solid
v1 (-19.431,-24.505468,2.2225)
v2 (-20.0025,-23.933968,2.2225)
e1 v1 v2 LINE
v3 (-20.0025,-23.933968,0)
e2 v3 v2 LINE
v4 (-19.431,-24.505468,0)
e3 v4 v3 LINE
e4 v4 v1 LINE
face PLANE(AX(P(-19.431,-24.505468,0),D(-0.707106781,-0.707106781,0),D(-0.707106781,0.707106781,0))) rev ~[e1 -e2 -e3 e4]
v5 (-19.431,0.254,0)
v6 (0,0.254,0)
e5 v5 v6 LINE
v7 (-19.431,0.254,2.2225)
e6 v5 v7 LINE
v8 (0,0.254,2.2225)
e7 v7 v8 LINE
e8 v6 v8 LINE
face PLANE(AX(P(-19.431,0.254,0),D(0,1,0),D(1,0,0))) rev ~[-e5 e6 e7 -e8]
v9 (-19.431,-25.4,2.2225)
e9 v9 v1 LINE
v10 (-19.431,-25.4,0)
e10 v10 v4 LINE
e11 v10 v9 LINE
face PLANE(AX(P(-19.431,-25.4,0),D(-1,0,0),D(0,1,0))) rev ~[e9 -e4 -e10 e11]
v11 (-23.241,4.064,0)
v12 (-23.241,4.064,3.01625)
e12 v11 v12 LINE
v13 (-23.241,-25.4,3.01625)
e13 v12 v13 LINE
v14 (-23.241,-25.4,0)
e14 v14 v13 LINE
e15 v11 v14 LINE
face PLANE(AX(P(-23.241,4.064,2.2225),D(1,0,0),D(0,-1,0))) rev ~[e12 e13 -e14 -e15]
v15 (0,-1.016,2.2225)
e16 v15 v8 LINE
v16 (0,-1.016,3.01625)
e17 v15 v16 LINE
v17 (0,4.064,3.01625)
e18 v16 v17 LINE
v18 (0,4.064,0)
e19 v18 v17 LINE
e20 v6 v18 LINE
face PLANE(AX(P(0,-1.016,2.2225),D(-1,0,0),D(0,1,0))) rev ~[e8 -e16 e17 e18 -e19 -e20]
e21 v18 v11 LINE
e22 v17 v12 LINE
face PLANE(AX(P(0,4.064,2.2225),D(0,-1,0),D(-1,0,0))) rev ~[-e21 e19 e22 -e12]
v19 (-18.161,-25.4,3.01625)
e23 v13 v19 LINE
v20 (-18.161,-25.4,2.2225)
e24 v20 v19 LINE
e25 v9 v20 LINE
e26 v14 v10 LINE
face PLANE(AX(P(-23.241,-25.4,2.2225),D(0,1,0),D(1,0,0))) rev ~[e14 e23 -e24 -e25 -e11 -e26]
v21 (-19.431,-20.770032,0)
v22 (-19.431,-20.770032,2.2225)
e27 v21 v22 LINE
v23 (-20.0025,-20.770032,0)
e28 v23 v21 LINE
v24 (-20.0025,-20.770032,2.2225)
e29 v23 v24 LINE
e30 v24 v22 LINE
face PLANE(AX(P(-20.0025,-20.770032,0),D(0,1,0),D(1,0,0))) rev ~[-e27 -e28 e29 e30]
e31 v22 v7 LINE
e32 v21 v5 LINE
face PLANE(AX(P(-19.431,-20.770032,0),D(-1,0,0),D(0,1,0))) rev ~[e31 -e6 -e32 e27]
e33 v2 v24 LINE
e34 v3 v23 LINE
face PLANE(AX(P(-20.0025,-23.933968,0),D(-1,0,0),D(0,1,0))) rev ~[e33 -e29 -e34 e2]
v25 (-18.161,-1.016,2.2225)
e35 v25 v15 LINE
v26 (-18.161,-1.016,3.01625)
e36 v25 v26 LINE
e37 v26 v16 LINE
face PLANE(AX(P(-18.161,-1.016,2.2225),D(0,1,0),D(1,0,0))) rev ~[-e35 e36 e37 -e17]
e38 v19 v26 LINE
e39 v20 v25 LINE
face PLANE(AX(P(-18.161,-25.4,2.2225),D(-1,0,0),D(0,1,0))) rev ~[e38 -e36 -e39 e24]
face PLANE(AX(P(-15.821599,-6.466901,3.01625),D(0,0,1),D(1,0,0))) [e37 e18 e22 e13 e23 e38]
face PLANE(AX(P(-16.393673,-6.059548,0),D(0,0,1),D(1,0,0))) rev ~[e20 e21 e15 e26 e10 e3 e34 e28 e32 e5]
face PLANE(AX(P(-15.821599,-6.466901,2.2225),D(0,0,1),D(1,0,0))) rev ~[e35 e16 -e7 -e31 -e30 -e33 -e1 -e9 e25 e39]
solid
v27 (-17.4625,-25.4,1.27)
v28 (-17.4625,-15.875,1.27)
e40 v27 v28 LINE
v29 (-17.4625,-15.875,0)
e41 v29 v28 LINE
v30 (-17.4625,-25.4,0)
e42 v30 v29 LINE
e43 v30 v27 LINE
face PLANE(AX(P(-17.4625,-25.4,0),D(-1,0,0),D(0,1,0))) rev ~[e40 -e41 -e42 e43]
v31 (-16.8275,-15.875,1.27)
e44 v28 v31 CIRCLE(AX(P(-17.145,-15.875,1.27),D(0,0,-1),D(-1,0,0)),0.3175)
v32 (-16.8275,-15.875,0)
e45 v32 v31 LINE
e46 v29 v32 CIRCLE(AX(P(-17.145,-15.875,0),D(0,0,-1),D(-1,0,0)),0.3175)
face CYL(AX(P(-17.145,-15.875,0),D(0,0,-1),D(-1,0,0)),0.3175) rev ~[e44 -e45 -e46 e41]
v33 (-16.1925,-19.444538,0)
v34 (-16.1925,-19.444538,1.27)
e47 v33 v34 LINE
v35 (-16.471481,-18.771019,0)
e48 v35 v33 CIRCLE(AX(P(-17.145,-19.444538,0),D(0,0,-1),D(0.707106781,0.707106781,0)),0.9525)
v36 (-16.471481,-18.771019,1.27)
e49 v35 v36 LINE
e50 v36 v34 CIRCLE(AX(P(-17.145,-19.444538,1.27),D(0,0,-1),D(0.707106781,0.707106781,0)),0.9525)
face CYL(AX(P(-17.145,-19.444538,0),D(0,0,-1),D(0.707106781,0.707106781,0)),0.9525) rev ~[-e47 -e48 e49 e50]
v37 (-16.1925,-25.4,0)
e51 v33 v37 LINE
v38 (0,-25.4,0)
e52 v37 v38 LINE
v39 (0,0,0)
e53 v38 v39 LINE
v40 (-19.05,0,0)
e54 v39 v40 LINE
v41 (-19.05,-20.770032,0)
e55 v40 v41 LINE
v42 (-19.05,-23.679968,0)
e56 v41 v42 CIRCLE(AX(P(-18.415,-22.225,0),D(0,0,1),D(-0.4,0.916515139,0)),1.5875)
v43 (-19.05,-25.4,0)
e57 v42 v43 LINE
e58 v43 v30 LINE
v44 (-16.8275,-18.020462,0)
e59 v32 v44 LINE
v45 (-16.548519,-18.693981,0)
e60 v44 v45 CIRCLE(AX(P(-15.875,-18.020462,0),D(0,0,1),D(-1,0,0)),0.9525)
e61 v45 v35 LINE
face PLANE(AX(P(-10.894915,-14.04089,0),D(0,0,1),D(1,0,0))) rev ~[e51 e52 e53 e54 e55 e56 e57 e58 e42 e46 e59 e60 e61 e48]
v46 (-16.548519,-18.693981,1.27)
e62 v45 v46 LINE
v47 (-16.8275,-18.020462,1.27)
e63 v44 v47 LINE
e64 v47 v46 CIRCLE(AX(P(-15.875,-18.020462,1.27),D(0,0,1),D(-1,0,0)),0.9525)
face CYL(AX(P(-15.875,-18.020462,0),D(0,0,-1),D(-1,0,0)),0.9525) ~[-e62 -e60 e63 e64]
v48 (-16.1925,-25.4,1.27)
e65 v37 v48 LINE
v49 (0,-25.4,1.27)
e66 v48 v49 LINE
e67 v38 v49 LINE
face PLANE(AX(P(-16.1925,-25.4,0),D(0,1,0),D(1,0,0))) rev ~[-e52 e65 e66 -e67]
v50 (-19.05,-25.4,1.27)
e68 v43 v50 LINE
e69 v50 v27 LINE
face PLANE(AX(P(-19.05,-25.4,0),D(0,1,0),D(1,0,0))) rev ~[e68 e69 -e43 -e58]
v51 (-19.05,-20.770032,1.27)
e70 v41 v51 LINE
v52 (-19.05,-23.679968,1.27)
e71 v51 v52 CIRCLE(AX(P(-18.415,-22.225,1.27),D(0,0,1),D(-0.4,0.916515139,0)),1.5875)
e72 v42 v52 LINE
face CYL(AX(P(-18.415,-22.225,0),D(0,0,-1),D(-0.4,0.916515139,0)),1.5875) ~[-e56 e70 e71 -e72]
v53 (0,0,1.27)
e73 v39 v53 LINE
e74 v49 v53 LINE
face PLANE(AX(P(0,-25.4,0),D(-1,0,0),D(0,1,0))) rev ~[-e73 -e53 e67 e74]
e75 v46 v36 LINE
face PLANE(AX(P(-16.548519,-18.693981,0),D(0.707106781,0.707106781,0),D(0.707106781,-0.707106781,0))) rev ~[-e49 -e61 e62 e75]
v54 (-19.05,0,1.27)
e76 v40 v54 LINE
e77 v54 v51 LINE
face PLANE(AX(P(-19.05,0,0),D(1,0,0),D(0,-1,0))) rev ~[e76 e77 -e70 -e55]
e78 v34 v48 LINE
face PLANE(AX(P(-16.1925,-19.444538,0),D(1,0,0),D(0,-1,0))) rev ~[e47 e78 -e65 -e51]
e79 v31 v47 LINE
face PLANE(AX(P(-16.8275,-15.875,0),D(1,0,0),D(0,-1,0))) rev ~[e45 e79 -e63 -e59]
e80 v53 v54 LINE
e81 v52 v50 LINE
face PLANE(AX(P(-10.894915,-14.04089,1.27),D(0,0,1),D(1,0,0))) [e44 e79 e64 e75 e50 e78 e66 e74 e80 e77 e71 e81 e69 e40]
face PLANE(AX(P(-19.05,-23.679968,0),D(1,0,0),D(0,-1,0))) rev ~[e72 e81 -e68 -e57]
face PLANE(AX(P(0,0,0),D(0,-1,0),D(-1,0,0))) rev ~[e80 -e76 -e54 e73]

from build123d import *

# Parameters (mm, degrees)
F1_DEPTH = 1.27
F3_DEPTH = 2.2225
F5_DEPTH = 0.79375


# Not quite as in the source:
# - a feature of the source that left no trace in its solid (it failed there, or was rolled back) is left out


with BuildPart() as f1:
    # F0 (on Top) → F1 (new body)
    with BuildSketch(Plane.XY):
        with BuildLine():
            Line((0, -25.4), (0, 0))
            Line((0, 0), (-19.05, 0))
            Line((-19.05, 0), (-19.05, -20.7700322169))
            ThreePointArc((-19.05, -20.7700322169), (-20.0025, -22.225), (-19.05, -23.6799677831))
            Line((-19.05, -23.6799677831), (-19.05, -25.4))
            Line((-19.05, -25.4), (-17.4625, -25.4))
            Line((-17.4625, -25.4), (-17.4625, -15.875))
            ThreePointArc((-17.4625, -15.875), (-17.145, -15.5575), (-16.8275, -15.875))
            Line((-16.8275, -15.875), (-16.8275, -18.0204615818))
            ThreePointArc((-16.8275, -18.0204615818), (-16.7549952547, -18.3849675512), (-16.5485192091, -18.6939807909))
            Line((-16.5485192091, -18.6939807909), (-16.4714807909, -18.7710192091))
            ThreePointArc((-16.4714807909, -18.7710192091), (-16.2650047453, -19.0800324488), (-16.1925, -19.4445384182))
            Line((-16.1925, -19.4445384182), (-16.1925, -25.4))
            Line((-16.1925, -25.4), (0, -25.4))
        make_face()
    extrude(amount=F1_DEPTH)


with BuildPart() as f3:
    # F2 (on Top) → F3 (new body)
    with BuildSketch(Plane.XY):
        Polygon((-23.241, -25.4), (-19.431, -25.4), (-19.431, -24.5054677831), (-20.0025, -23.9339677831), (-20.0025, -20.7700322169), (-19.431, -20.7700322169), (-19.431, 0.254), (0, 0.254), (0, 4.064), (-23.241, 4.064), align=None)
    extrude(amount=F3_DEPTH)

    # F4 (on face) → F5 (join)
    with BuildSketch(Plane.XY.offset(2.2225)):
        Polygon((0, -1.016), (0, 4.064), (-23.241, 4.064), (-23.241, -25.4), (-18.161, -25.4), (-18.161, -1.016), align=None)
    extrude(amount=F5_DEPTH)


solid = Compound([f1.part, f3.part])
